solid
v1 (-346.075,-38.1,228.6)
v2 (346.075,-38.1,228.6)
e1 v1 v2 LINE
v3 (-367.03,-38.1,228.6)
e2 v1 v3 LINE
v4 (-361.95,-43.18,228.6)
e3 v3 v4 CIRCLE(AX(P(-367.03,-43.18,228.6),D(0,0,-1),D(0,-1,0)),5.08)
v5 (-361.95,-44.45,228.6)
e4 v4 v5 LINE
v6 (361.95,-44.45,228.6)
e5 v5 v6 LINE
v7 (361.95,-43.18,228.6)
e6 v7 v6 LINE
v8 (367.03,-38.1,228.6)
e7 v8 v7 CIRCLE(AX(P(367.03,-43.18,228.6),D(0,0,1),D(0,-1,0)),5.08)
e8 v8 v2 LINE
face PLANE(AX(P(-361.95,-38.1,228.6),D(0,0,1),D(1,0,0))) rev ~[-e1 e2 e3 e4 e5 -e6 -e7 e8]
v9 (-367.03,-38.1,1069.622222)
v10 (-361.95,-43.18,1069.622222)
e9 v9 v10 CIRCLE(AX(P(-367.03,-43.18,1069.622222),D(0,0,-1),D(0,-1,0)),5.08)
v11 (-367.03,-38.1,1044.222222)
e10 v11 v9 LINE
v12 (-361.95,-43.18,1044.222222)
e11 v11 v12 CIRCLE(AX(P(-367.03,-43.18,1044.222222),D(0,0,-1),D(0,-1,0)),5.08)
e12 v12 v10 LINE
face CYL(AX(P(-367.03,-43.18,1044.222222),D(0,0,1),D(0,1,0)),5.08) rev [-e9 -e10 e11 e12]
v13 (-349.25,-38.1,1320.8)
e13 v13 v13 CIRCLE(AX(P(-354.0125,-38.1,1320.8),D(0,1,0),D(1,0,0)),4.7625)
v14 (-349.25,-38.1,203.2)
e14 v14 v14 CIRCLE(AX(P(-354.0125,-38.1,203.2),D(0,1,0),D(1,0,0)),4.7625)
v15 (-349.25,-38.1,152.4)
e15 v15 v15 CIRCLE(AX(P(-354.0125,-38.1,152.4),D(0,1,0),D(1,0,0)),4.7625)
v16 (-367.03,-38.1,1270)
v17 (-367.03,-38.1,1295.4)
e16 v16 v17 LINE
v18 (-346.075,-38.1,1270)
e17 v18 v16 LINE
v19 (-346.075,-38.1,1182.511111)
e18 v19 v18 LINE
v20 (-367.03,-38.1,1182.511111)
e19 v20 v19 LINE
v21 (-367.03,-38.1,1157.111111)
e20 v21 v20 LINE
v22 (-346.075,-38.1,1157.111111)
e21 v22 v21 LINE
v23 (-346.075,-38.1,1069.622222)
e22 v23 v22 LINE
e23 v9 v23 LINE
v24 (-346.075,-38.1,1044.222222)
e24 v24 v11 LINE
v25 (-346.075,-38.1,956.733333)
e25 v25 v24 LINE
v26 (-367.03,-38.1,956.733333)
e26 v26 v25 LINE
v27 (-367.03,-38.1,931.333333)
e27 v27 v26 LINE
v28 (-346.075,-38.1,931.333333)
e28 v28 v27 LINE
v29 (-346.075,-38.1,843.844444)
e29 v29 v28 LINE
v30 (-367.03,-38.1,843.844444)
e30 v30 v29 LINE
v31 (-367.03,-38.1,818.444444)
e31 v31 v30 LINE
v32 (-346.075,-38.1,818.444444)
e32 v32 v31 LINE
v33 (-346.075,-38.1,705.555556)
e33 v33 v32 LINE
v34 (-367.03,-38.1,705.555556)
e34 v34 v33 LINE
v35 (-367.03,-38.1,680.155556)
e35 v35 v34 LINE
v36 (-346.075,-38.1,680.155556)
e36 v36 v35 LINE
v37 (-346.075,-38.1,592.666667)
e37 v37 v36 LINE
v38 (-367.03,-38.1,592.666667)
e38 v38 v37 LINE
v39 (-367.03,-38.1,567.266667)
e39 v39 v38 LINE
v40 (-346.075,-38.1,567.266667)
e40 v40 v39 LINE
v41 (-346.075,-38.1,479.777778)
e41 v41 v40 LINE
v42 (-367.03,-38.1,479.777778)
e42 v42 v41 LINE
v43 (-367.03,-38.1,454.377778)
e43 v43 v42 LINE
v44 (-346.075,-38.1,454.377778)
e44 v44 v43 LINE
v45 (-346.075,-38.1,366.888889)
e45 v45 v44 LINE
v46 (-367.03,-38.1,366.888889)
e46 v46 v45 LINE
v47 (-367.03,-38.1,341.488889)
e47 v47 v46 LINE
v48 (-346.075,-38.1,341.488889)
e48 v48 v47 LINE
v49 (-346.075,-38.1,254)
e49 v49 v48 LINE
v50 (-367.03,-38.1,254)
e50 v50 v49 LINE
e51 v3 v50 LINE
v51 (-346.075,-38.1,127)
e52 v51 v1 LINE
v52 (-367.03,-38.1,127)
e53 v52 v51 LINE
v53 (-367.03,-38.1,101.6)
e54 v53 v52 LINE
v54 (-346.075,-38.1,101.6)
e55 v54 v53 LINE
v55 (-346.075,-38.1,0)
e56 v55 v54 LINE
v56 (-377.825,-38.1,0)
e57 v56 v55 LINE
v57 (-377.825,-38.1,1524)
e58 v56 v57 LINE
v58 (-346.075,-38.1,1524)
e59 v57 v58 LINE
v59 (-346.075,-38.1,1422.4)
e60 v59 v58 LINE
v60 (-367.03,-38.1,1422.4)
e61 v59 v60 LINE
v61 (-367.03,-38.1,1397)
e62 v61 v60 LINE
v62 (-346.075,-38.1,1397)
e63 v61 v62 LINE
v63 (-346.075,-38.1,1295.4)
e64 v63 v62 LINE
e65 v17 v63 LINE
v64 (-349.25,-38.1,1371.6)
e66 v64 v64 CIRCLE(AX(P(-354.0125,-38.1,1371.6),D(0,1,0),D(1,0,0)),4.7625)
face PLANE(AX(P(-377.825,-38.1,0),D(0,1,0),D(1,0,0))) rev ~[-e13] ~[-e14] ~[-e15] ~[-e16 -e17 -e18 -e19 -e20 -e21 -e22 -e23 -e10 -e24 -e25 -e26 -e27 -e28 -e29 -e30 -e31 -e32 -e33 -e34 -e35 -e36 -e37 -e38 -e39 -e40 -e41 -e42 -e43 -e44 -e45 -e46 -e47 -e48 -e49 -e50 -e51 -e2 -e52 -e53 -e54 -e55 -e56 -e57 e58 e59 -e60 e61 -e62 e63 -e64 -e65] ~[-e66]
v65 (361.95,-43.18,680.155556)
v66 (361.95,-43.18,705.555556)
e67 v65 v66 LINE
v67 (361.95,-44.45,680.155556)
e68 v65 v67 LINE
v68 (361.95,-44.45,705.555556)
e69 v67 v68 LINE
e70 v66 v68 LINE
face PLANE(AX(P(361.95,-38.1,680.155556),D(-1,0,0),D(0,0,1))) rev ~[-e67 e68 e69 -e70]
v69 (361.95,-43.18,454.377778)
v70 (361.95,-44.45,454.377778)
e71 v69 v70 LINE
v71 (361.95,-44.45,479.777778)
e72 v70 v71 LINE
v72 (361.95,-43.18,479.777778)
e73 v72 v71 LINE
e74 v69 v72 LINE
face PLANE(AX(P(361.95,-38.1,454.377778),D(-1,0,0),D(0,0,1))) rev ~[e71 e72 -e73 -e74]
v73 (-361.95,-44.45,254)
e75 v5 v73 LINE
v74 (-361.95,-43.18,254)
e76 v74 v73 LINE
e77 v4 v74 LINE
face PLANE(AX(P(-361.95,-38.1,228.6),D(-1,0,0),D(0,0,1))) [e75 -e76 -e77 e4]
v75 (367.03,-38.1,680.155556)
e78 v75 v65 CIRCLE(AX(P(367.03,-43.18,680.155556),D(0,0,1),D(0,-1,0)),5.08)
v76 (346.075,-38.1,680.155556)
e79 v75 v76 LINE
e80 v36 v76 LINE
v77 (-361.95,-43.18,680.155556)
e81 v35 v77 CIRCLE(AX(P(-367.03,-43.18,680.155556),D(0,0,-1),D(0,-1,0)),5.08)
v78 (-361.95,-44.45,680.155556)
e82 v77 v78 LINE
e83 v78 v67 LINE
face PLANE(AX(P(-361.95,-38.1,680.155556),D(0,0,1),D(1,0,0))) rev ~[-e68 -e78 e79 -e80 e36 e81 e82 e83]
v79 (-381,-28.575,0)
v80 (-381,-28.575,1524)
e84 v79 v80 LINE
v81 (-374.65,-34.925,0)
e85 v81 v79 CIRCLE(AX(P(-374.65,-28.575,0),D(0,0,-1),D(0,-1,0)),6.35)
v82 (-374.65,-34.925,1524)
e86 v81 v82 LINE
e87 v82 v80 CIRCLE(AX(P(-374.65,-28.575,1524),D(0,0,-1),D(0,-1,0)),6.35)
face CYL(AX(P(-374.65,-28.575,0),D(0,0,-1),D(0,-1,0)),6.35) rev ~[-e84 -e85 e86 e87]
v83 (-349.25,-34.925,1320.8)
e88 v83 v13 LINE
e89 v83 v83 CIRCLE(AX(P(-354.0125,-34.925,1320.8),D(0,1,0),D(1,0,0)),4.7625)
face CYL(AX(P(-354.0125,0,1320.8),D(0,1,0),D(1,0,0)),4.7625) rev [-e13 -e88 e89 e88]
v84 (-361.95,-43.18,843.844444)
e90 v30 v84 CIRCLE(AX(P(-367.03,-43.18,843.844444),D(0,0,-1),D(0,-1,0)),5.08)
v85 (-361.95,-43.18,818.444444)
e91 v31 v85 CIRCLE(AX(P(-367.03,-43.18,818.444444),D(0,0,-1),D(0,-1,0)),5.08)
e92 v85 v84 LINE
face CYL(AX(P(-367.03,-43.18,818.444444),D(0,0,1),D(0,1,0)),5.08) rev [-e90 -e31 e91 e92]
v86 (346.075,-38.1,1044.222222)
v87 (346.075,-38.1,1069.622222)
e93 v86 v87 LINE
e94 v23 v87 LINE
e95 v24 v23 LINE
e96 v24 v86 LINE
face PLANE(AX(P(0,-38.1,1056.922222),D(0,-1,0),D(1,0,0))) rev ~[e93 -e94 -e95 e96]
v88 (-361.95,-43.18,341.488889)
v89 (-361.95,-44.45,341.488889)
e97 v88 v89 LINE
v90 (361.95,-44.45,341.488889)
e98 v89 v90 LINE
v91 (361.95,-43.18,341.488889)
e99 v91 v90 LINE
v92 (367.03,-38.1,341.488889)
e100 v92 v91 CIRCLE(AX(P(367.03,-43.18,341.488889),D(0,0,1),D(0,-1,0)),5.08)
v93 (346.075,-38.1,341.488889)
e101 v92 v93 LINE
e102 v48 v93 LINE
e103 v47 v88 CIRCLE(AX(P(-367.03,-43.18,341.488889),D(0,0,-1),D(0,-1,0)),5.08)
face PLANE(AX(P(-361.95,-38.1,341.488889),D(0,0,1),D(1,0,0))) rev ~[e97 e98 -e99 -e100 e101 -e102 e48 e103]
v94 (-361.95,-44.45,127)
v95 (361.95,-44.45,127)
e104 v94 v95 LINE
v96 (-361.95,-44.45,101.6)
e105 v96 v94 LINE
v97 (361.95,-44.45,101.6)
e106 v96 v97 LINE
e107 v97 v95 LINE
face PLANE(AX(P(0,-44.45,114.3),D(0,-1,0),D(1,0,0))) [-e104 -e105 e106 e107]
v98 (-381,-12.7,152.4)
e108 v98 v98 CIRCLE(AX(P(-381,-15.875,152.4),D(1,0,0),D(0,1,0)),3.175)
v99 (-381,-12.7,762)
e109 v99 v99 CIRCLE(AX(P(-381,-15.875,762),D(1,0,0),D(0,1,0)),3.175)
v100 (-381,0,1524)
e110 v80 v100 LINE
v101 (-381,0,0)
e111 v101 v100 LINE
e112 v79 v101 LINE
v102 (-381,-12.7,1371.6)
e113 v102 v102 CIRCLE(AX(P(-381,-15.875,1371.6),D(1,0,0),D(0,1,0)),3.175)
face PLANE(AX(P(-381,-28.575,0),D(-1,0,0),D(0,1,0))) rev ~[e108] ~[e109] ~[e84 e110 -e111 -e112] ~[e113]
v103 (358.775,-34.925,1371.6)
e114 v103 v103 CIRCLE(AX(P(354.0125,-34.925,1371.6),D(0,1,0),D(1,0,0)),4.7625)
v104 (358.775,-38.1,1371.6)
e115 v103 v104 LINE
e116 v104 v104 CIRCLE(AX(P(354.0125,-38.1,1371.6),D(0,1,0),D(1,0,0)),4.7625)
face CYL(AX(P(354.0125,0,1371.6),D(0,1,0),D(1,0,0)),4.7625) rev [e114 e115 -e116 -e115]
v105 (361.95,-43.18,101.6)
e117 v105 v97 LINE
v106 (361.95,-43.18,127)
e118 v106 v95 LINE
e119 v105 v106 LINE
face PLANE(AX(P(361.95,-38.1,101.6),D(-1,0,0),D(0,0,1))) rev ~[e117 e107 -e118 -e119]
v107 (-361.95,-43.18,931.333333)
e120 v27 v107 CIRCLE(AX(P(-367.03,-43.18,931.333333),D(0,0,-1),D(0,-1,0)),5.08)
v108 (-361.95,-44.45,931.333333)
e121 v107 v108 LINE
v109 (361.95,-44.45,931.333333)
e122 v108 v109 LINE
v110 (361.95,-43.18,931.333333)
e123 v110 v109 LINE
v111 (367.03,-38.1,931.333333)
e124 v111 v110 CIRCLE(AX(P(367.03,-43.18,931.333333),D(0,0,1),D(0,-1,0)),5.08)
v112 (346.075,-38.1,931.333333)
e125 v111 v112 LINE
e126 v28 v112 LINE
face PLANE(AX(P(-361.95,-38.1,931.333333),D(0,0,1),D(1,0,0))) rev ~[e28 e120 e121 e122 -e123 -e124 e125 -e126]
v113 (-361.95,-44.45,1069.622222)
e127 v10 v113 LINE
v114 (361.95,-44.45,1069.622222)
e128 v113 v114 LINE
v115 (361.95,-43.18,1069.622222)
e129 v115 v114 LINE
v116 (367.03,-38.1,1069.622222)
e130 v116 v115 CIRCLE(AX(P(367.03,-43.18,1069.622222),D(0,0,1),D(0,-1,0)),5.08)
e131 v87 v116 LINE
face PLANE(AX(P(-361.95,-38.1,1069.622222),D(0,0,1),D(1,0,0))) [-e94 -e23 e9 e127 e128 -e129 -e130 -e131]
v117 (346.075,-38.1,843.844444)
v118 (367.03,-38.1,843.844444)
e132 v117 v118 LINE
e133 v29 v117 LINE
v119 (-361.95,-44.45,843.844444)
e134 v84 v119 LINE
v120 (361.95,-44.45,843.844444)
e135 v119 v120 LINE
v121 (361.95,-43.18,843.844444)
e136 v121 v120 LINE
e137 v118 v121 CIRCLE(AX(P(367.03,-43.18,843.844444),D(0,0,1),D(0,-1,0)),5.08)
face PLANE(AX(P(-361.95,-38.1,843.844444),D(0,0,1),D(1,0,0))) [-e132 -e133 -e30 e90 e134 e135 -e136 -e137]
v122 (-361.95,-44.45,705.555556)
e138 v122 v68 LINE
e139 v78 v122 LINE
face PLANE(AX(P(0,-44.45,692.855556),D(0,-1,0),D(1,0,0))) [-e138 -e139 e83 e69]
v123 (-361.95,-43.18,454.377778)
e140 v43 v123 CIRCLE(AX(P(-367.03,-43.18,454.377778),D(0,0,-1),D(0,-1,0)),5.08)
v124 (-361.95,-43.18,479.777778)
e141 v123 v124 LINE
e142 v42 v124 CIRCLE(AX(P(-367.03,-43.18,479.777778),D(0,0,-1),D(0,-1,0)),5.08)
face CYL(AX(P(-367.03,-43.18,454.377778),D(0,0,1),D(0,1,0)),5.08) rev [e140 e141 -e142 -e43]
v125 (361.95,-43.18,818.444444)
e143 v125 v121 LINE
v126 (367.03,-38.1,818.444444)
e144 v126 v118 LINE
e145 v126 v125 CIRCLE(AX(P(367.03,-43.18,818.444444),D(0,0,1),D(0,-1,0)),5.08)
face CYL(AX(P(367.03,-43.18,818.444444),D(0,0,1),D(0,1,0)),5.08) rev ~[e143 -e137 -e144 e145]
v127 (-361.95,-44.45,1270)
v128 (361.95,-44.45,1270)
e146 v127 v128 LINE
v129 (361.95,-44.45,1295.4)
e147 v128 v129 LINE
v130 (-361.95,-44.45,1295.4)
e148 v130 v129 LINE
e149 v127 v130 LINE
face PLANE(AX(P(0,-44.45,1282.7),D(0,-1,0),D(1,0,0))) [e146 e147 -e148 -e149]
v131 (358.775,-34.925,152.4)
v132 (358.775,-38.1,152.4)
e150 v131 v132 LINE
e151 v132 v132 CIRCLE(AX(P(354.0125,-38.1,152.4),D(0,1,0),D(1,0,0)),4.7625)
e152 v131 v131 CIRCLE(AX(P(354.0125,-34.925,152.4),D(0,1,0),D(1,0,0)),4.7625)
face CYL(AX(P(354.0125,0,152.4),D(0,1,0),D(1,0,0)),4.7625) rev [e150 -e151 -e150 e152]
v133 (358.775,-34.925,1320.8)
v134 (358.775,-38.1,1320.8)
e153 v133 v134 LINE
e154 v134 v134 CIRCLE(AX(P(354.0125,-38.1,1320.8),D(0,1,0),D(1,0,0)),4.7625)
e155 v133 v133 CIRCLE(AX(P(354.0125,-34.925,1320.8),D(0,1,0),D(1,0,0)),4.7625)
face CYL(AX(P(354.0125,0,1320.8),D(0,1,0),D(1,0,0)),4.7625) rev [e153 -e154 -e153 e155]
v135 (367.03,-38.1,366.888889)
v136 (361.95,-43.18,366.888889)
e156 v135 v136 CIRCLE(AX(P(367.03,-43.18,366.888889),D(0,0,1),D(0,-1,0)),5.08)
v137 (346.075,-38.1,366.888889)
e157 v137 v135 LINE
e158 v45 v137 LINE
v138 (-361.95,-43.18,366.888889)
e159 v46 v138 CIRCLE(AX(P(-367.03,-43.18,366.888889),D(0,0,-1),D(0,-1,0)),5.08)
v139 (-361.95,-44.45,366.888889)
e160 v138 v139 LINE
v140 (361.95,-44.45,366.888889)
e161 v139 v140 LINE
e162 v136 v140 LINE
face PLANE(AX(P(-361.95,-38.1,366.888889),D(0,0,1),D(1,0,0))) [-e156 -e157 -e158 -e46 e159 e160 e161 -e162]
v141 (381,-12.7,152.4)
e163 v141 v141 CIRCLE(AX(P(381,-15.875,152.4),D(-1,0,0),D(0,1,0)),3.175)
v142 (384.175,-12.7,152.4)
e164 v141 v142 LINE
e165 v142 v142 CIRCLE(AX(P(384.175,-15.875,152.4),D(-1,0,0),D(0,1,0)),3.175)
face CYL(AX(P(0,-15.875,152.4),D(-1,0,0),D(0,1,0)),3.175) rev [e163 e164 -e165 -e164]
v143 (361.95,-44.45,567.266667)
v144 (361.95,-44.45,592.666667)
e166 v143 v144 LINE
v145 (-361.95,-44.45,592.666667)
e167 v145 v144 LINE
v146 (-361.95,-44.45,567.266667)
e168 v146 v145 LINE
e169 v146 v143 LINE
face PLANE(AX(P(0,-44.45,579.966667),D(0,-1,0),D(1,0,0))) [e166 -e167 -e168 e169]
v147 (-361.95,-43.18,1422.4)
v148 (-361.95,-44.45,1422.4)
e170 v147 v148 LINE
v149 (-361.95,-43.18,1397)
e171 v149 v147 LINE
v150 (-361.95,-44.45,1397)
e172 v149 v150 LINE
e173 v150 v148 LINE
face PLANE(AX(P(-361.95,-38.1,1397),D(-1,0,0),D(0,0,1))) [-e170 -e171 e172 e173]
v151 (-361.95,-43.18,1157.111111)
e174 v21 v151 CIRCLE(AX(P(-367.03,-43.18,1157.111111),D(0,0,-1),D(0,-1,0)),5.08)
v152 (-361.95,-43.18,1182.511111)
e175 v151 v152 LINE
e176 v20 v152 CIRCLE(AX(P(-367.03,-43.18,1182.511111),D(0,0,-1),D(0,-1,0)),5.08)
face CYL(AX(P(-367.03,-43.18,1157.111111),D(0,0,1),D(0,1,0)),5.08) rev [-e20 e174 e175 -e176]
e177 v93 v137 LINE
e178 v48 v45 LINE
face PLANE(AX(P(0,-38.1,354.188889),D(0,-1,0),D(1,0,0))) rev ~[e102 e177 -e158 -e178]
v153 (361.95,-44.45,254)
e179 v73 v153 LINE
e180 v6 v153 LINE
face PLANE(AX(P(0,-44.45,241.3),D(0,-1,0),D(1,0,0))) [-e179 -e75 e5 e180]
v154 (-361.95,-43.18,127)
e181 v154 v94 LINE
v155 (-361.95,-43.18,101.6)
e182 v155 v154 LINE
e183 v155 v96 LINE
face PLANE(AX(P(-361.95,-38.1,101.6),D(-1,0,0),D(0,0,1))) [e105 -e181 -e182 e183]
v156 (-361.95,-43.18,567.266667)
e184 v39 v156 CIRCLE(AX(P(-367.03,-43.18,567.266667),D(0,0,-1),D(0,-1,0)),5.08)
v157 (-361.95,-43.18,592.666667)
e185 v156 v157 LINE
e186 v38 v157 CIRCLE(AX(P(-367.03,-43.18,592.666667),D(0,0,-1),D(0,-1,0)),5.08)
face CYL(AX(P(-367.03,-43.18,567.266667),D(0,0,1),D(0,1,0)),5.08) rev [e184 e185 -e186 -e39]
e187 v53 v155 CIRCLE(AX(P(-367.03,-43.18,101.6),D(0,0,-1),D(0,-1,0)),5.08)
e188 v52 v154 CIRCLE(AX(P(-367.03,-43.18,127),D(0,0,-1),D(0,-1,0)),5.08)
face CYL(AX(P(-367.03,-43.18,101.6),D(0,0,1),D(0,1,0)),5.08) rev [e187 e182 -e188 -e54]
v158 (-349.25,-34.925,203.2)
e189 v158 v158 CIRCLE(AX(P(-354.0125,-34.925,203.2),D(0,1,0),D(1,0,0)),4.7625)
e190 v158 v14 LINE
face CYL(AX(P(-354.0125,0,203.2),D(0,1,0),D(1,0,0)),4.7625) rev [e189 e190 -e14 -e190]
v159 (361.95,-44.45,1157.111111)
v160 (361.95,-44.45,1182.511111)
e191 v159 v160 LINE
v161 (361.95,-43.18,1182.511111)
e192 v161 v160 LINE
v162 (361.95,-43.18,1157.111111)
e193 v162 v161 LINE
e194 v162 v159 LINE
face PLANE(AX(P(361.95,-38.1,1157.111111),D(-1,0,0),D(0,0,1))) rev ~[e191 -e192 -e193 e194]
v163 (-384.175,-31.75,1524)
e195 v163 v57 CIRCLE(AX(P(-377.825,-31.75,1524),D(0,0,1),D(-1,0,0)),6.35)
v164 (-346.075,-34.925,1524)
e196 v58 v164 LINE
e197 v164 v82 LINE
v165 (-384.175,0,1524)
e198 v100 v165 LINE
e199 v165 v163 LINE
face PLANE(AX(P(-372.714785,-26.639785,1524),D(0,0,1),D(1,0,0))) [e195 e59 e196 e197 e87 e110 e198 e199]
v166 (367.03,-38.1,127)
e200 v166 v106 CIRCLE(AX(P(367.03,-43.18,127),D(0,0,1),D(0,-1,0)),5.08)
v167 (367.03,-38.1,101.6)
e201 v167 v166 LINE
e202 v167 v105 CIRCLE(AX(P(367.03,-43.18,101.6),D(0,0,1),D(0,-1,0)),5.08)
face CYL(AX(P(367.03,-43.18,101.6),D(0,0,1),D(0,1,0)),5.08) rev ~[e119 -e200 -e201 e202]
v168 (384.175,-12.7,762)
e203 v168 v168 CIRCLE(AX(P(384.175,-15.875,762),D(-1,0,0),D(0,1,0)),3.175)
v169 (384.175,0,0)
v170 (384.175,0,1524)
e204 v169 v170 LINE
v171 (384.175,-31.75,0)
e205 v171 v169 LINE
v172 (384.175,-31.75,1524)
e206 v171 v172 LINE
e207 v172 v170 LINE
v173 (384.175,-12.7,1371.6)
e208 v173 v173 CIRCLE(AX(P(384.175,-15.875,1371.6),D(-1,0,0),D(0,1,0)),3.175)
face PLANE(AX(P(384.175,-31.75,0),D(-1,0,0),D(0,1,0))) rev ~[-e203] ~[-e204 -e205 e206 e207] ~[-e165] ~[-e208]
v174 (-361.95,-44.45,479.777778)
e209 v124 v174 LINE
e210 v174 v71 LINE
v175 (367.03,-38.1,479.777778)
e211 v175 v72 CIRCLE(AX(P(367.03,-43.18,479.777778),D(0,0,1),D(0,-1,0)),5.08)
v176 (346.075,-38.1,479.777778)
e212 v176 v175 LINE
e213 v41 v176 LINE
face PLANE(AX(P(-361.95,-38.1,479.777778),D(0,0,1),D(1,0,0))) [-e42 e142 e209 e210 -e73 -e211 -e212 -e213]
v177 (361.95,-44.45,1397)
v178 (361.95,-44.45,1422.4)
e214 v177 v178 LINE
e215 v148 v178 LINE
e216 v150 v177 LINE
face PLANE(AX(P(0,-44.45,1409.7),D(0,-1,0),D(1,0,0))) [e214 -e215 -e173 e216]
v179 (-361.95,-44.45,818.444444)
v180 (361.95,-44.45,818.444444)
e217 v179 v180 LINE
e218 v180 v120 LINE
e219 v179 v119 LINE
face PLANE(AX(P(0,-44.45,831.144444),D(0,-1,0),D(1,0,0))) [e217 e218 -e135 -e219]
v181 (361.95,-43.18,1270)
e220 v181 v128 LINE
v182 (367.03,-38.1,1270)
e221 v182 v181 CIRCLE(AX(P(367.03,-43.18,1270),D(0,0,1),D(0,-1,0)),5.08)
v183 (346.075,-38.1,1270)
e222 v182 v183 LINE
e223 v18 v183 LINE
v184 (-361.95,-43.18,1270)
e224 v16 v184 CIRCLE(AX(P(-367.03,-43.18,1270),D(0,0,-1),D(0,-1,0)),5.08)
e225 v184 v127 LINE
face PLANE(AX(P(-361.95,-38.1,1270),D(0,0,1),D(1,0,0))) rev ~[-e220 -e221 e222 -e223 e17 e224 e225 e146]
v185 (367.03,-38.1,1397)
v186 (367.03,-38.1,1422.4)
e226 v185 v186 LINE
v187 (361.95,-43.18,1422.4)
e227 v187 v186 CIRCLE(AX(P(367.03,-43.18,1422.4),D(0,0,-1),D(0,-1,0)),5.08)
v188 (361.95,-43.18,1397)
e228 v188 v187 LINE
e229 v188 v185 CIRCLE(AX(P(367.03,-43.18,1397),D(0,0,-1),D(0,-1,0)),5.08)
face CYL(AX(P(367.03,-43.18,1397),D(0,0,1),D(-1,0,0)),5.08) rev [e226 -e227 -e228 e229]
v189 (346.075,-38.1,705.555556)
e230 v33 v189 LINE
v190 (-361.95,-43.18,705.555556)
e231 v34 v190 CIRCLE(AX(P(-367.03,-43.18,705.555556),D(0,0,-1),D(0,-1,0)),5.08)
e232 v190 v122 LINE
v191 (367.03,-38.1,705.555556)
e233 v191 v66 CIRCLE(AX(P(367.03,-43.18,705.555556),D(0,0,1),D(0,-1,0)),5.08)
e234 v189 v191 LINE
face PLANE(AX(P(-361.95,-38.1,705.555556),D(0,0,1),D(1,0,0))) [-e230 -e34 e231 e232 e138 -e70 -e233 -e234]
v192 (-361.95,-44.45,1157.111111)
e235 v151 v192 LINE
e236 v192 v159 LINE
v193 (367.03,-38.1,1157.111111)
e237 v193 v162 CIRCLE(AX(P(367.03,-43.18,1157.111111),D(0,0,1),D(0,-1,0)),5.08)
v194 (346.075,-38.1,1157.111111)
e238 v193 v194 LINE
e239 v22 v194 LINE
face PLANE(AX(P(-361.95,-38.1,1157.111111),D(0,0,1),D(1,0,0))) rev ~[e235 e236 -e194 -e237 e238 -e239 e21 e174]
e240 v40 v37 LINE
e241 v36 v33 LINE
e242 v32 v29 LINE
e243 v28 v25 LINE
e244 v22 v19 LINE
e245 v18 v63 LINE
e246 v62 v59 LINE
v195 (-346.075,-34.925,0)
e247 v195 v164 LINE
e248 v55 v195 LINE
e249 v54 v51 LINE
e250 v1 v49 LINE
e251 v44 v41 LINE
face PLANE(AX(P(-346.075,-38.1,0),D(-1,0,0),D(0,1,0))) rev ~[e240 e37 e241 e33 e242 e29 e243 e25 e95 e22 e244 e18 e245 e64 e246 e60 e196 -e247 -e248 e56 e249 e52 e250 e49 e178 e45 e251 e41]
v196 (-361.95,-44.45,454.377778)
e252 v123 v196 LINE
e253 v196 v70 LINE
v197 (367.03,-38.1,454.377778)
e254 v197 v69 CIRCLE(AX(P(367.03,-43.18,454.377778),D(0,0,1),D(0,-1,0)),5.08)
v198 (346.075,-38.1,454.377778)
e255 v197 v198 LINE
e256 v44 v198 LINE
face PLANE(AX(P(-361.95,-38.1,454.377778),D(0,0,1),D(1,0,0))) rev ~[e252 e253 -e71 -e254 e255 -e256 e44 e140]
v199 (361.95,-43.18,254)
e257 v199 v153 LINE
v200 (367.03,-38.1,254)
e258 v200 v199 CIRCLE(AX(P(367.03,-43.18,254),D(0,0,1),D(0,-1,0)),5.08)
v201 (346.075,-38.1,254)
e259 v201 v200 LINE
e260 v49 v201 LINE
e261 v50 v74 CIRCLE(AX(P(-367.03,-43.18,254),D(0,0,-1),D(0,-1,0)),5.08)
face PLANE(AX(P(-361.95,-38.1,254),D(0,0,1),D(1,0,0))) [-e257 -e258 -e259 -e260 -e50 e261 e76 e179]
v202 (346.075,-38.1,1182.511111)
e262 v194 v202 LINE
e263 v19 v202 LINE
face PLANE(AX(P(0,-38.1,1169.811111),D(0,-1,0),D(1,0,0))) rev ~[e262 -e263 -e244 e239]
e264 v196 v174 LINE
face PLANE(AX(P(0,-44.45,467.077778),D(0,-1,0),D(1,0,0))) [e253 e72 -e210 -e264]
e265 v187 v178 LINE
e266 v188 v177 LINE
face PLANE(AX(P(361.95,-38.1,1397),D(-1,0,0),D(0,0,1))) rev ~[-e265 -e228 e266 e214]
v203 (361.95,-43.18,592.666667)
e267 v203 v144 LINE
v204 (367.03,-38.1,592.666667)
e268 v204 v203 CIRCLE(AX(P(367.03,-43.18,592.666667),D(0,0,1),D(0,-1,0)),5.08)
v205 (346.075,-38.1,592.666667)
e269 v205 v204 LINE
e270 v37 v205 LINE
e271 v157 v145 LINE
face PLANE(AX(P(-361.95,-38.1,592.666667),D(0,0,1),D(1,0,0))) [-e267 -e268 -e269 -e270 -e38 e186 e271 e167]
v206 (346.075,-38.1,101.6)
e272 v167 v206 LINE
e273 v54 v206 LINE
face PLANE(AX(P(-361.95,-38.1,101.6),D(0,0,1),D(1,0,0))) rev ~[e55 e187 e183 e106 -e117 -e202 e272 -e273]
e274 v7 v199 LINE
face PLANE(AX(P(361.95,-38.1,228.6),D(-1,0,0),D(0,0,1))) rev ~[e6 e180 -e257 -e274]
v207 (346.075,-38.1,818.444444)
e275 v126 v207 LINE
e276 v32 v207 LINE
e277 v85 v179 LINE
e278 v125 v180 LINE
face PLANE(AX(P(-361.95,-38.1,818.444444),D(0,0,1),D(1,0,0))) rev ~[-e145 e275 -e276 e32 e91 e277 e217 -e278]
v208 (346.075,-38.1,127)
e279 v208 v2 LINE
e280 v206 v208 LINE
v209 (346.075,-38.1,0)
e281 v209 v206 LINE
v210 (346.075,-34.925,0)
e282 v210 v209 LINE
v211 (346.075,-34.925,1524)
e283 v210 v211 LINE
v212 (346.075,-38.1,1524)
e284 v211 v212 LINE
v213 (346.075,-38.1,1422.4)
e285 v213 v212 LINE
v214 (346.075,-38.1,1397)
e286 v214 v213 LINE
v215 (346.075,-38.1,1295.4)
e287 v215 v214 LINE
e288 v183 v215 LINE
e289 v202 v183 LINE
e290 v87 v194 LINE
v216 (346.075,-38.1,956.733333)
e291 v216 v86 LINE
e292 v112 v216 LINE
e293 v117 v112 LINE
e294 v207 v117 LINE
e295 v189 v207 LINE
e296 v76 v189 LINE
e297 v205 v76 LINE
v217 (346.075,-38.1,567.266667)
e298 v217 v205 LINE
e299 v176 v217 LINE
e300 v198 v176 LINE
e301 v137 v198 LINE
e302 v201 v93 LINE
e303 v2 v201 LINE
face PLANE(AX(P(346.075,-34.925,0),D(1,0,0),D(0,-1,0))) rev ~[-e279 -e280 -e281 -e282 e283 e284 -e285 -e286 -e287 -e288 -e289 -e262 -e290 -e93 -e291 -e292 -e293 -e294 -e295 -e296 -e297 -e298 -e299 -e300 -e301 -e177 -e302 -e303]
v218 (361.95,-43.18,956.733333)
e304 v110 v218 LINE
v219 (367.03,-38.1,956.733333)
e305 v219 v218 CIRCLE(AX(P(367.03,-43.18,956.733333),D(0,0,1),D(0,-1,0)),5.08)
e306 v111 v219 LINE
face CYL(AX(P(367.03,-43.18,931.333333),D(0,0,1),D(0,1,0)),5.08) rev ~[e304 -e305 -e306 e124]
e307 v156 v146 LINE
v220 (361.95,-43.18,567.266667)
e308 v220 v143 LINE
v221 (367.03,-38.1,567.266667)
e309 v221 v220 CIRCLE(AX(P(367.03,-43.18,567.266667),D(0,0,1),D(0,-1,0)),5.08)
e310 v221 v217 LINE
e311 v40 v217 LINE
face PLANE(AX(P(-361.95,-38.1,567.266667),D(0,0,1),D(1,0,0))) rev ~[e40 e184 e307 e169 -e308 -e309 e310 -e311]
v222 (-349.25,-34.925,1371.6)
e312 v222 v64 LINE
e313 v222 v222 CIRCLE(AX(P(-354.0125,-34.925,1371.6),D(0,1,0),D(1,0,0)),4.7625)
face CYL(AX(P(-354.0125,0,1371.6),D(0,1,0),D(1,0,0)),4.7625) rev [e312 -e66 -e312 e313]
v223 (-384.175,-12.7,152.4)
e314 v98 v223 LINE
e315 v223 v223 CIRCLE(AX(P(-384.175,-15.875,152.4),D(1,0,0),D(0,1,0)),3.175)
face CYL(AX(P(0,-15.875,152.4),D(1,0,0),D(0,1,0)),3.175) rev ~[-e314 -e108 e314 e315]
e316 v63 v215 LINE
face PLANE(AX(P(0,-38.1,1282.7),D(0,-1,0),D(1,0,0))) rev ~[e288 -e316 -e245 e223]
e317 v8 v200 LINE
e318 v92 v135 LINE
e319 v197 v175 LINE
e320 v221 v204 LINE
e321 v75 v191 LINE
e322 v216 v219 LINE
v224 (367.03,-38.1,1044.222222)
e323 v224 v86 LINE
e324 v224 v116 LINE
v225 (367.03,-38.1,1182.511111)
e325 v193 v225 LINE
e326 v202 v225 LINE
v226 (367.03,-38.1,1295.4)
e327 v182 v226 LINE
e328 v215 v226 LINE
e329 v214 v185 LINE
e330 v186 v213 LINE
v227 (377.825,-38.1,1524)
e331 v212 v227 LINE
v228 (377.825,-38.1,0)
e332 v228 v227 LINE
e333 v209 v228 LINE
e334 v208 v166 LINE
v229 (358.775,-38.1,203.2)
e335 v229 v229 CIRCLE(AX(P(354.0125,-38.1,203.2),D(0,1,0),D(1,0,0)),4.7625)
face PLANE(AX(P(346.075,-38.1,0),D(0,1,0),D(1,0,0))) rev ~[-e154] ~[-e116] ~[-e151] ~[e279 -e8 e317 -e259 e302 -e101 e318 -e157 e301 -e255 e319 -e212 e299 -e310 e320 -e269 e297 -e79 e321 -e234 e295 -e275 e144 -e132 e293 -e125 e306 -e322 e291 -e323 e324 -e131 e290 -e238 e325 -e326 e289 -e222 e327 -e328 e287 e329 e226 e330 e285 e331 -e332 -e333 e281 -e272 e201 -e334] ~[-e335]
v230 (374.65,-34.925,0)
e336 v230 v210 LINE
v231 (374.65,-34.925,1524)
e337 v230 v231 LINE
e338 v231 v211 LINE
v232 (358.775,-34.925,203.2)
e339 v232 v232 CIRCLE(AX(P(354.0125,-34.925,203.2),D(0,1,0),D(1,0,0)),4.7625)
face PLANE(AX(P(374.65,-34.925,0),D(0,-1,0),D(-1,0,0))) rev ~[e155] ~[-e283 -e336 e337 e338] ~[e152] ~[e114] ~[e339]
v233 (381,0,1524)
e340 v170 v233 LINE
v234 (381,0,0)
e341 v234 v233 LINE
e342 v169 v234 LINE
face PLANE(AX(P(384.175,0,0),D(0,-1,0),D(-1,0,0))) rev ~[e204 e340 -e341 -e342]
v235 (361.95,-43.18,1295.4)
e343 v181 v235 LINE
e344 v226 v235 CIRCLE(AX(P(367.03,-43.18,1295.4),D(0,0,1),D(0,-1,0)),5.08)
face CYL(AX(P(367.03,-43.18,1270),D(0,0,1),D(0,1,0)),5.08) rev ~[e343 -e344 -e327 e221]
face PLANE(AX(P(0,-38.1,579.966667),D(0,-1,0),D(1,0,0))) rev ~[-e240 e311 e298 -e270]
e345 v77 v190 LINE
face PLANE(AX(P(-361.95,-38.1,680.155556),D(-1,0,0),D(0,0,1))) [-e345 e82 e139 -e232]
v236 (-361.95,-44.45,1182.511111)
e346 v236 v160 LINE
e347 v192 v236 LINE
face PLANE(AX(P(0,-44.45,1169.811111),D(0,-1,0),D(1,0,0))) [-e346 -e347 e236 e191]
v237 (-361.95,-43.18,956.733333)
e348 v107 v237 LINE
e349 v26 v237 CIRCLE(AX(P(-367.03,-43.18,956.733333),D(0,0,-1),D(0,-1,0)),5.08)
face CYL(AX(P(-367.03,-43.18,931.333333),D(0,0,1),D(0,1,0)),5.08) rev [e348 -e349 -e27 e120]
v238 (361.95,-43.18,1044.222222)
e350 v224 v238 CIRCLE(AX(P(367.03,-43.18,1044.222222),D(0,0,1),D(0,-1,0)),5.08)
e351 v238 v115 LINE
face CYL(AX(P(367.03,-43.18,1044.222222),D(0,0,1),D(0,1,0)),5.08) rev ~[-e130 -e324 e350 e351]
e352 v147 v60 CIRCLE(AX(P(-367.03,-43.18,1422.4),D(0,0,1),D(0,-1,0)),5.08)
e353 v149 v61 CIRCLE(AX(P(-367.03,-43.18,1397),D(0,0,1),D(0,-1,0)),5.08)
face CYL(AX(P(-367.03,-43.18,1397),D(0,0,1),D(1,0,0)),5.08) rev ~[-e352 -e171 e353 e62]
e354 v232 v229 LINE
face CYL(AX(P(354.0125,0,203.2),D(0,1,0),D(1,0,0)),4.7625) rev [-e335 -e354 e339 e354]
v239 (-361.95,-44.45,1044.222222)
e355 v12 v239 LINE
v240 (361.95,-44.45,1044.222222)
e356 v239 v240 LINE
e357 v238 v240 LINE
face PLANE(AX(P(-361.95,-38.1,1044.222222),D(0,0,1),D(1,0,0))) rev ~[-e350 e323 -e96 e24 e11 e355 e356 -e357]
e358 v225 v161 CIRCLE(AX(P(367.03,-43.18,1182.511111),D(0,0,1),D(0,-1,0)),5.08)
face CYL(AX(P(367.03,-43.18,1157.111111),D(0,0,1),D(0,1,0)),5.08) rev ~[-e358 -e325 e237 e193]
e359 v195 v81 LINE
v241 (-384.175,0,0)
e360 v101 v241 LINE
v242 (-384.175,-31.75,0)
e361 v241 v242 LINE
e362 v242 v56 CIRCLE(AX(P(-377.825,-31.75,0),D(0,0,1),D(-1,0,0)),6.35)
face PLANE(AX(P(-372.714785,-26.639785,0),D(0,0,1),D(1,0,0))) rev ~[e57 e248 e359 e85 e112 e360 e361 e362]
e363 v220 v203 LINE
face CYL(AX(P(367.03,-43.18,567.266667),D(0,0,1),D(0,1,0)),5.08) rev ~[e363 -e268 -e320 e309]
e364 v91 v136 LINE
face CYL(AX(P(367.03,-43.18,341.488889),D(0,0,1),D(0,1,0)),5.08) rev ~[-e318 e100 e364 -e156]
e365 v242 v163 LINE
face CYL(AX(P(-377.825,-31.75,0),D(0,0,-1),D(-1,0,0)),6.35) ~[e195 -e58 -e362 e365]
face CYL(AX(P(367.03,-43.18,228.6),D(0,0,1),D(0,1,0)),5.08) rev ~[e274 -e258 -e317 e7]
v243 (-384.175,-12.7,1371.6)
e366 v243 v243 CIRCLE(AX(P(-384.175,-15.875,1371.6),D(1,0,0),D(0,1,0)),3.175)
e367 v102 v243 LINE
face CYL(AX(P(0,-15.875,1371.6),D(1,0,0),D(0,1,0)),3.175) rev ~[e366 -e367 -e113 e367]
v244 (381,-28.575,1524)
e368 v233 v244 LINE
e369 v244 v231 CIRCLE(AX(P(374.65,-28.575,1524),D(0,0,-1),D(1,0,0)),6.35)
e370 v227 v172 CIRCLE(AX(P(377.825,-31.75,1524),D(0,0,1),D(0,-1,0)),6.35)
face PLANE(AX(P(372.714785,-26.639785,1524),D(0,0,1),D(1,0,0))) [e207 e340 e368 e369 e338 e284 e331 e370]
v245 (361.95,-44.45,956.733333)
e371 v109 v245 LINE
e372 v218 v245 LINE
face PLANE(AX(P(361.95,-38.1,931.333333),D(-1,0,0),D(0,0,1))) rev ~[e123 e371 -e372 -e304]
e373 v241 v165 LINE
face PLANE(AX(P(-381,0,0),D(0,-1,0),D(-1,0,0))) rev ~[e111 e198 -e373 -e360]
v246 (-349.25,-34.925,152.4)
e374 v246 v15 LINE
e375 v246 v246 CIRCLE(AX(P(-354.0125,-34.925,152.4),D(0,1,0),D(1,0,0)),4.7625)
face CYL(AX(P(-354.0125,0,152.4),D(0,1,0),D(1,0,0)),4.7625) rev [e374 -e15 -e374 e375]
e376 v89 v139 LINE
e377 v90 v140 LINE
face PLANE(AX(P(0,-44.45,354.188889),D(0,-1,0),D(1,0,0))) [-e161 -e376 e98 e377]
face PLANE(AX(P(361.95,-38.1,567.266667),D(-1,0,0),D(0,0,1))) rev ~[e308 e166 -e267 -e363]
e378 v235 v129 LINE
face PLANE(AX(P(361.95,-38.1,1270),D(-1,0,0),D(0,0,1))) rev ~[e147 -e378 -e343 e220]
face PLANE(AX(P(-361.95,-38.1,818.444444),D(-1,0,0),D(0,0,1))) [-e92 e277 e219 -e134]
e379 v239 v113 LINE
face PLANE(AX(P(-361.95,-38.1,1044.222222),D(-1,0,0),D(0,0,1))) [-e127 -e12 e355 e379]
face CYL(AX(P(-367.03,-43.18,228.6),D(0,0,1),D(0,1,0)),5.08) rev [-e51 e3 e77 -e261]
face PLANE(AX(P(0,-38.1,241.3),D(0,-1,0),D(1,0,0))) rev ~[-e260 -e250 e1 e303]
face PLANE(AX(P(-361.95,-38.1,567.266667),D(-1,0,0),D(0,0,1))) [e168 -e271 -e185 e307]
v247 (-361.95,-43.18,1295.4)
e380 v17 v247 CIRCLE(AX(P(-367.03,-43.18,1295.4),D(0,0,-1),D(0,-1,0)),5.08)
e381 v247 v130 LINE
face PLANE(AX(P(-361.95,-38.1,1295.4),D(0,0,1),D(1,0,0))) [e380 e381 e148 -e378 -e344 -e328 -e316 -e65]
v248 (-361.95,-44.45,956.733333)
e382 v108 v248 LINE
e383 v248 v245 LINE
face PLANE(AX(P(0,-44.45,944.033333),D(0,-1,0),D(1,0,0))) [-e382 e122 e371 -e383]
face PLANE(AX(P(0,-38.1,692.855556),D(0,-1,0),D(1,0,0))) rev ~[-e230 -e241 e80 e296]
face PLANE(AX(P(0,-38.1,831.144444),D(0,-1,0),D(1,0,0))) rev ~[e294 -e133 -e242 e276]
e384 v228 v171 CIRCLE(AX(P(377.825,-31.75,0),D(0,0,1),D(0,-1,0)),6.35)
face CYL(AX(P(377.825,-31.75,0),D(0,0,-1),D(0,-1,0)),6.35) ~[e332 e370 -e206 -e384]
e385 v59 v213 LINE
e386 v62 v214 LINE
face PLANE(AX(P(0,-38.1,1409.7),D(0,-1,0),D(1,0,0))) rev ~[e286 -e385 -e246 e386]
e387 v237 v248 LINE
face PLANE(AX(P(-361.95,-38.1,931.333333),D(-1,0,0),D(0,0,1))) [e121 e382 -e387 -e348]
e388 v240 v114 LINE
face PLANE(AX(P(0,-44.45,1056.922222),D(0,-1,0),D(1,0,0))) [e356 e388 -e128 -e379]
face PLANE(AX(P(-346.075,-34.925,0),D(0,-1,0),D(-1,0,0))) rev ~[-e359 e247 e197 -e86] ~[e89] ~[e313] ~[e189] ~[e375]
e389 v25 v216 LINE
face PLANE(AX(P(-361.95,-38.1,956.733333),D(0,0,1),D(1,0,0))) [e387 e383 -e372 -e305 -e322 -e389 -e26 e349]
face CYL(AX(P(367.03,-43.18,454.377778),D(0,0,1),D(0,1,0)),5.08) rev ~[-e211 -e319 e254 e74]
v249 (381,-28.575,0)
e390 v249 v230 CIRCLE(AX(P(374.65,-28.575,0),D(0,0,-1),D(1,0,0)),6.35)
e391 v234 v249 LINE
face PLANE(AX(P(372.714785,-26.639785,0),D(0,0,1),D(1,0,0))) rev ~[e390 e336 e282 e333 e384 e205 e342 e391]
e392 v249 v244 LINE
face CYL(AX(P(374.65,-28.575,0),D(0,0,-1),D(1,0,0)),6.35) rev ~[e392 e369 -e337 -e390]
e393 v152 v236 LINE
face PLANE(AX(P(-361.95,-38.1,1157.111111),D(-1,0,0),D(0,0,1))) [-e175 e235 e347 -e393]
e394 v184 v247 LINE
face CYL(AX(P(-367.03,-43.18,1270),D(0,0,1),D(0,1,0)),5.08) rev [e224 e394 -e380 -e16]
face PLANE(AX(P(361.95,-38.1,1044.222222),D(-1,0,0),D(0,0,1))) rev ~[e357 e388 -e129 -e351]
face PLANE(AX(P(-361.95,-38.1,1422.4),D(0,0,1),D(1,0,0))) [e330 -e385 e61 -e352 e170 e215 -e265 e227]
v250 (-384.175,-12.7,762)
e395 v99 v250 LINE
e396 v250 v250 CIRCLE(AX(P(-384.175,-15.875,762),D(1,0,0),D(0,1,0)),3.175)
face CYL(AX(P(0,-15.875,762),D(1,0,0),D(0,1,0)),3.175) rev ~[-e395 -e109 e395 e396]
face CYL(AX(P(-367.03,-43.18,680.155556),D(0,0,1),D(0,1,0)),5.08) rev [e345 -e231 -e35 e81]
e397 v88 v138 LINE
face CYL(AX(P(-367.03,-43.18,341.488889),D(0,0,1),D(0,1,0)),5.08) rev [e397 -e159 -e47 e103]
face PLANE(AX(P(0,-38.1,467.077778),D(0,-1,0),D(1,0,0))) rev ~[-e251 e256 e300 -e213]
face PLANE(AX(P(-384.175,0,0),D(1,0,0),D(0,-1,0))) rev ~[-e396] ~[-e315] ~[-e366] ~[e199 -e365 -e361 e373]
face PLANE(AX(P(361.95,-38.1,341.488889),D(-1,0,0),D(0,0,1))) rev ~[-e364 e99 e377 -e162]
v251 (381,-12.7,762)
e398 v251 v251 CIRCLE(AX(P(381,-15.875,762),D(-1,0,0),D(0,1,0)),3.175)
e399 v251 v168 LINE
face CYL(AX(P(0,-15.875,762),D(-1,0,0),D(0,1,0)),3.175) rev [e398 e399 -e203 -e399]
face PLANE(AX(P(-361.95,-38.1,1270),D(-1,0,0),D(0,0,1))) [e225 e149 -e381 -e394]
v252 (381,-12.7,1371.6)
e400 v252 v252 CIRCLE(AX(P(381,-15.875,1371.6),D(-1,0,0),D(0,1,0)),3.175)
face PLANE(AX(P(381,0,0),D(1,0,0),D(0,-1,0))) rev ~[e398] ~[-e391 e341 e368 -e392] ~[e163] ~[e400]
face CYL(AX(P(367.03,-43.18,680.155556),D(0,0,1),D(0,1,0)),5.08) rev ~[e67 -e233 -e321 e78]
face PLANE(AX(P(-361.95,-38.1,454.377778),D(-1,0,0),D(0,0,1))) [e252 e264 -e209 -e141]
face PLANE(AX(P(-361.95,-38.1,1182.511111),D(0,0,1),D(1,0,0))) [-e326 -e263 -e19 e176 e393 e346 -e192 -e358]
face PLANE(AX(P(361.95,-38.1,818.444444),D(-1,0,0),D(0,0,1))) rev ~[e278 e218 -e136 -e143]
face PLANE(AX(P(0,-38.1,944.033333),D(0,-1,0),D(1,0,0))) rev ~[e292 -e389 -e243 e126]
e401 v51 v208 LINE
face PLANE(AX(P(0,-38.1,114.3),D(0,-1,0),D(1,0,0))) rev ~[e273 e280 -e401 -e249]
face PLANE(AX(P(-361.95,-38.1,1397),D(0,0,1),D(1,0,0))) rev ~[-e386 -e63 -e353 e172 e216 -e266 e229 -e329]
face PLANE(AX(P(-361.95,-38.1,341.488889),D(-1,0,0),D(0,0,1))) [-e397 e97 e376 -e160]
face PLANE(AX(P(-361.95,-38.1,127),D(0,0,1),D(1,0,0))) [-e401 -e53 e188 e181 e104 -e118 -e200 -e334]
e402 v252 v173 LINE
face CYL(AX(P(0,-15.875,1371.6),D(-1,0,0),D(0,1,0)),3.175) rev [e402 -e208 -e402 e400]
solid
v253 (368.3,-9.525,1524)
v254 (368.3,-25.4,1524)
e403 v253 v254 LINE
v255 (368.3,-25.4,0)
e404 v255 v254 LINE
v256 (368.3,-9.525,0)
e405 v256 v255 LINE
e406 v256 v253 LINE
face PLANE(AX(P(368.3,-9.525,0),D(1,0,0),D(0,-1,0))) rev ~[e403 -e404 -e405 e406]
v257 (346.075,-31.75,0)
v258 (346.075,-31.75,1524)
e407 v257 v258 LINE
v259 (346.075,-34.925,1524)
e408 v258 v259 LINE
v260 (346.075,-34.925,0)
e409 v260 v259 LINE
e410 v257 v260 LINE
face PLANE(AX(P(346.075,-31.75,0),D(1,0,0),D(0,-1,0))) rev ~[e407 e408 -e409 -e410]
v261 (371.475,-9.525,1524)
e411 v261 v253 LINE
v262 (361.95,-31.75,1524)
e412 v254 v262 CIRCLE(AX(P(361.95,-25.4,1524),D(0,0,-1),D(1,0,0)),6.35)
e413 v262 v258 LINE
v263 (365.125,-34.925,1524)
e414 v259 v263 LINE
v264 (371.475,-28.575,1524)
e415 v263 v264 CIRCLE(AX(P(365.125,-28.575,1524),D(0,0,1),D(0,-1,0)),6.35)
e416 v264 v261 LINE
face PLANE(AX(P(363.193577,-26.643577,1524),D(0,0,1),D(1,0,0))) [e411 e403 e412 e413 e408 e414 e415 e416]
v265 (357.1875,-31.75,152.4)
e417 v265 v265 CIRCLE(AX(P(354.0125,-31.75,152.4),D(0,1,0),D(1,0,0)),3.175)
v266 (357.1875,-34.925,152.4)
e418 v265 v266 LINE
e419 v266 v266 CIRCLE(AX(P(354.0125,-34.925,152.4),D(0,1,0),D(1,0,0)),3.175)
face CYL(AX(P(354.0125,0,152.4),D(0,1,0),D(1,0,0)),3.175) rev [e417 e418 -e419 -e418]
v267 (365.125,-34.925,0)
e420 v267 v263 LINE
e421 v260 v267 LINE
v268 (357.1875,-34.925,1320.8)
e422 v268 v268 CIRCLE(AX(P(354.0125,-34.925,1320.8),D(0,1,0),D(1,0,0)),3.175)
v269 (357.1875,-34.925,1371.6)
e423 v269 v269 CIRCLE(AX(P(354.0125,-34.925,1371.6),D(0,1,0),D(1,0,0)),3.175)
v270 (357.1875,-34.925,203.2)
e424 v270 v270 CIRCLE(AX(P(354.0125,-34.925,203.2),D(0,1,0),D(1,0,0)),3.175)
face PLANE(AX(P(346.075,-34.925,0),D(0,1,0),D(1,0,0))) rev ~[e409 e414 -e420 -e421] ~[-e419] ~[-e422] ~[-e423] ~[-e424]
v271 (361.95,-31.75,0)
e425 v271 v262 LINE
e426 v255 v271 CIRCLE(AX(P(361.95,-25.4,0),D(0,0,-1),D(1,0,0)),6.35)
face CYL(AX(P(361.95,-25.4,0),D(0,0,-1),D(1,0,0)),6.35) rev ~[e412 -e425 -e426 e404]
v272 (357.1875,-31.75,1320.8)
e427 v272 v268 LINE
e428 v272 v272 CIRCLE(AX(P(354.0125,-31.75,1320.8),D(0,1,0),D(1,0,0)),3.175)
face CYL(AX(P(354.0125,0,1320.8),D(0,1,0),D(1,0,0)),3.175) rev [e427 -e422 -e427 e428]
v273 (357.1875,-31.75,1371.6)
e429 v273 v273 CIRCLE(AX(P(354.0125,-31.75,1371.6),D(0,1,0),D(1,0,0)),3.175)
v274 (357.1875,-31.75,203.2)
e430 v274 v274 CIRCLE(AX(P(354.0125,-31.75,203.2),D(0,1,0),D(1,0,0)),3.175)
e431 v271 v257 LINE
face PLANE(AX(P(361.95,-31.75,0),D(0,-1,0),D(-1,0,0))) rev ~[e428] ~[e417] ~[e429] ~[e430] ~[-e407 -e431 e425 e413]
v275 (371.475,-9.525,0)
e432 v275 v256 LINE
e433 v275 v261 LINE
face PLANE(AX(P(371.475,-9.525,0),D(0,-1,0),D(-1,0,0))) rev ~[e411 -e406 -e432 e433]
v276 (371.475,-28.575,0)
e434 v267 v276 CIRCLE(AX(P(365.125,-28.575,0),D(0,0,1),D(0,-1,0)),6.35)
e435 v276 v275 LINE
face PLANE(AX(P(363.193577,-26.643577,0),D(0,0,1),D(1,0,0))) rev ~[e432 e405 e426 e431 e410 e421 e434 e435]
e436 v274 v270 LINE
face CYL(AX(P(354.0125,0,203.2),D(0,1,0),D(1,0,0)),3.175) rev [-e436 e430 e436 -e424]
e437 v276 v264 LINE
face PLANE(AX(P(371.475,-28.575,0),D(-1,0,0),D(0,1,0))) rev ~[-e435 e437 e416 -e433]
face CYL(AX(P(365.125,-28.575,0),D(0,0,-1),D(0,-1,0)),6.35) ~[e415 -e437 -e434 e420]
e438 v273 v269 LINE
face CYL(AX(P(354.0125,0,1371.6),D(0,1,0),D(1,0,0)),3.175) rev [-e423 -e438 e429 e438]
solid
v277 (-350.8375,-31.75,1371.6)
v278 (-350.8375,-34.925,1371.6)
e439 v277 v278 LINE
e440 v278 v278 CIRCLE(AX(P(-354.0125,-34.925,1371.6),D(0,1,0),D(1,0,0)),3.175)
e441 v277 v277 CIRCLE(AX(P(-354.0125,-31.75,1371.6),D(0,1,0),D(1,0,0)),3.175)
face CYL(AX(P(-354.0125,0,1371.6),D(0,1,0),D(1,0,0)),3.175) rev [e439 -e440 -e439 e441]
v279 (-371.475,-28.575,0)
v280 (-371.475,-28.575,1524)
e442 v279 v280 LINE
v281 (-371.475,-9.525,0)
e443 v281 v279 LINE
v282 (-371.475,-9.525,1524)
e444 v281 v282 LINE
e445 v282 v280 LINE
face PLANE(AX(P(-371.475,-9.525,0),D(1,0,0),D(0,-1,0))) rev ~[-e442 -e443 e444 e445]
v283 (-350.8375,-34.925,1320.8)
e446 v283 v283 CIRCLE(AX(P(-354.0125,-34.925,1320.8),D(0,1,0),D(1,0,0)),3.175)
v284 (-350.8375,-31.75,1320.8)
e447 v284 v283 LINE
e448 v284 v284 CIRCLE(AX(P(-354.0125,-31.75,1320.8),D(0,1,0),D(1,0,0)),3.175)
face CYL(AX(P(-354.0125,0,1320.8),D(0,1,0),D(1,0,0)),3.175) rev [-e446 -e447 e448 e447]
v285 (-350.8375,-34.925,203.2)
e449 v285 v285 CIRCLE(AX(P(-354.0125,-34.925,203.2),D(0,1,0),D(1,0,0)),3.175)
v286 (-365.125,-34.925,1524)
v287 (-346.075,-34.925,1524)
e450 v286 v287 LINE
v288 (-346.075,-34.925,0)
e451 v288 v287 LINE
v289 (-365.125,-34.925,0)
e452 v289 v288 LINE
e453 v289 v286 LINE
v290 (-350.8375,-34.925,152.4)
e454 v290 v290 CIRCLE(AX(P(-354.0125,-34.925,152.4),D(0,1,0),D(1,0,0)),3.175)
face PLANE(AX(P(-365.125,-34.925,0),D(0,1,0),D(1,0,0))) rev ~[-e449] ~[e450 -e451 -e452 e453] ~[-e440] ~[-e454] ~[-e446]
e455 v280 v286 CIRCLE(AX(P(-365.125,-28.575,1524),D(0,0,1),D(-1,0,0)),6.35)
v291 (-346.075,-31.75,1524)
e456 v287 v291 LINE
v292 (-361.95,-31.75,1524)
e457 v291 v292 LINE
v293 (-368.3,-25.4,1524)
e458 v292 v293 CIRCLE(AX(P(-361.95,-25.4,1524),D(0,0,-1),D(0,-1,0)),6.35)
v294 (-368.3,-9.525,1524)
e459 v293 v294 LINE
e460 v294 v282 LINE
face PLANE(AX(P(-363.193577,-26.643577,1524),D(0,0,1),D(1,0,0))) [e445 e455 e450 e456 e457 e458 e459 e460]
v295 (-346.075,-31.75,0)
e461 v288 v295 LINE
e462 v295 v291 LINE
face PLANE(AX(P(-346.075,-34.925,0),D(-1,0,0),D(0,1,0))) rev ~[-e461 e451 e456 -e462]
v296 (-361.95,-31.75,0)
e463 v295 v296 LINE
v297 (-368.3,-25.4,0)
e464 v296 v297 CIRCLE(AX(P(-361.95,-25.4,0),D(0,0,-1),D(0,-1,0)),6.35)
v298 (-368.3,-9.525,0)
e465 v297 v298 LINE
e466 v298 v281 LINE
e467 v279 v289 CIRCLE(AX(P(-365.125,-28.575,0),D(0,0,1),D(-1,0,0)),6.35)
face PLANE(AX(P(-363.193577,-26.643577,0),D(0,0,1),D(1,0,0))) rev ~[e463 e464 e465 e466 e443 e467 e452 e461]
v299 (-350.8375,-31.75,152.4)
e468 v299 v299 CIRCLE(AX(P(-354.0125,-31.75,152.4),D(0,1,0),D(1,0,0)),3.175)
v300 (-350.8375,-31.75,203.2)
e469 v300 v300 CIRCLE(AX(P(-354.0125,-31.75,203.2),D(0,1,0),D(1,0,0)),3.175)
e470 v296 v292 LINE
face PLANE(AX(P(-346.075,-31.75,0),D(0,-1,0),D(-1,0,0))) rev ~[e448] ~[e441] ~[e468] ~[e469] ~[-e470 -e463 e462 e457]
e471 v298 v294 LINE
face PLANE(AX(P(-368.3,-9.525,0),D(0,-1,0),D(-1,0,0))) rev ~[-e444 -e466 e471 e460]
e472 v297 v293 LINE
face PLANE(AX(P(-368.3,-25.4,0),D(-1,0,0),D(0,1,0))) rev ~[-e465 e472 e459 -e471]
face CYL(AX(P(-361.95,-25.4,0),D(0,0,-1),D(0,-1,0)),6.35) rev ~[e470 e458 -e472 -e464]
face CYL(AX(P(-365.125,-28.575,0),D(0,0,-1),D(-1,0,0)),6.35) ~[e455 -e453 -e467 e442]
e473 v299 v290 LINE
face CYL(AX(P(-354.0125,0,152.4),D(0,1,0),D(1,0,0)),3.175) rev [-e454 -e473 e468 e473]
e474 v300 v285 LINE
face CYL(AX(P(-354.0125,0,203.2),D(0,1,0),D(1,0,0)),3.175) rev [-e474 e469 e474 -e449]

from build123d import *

# Parameters (mm, degrees)
F1_DEPTH      = 1524
F2_DEPTH      = 1524
F3_R          = 3.175
F4_DEPTH      = 384.176
F4_DEPTH_BACK = 384.176
F5_R          = 3.175
F7_DEPTH      = 38.101
F6_R          = 4.7625
F8_DEPTH      = 38.101
F9_W          = 723.9
F9_H          = 25.4
F10_DEPTH     = 6.35
F11_R         = 5.08


with BuildPart() as f1:
    # F0 (on Top) → F1 (new body)
    with BuildSketch(Plane.XY):
        with BuildLine():
            Line((-381, 0), (-384.175, 0))
            Line((-384.175, 0), (-384.175, -31.75))
            ThreePointArc((-384.175, -31.75), (-382.3151280605, -36.2401280605), (-377.825, -38.1))
            Line((-377.825, -38.1), (-346.075, -38.1))
            Line((-346.075, -38.1), (-346.075, -34.925))
            Line((-346.075, -34.925), (-365.125, -34.925))
            Line((-365.125, -34.925), (-374.65, -34.925))
            ThreePointArc((-374.65, -34.925), (-379.1401280605, -33.0651280605), (-381, -28.575))
            Line((-381, -28.575), (-381, 0))
        make_face()
    extrude(amount=F1_DEPTH)


with BuildPart() as f1b:
    # F0 (on Top) → F1, piece 2 (new body)
    with BuildSketch(Plane.XY):
        with BuildLine():
            Line((374.65, -34.925), (365.125, -34.925))
            Line((365.125, -34.925), (346.075, -34.925))
            Line((346.075, -34.925), (346.075, -38.1))
            Line((346.075, -38.1), (377.825, -38.1))
            ThreePointArc((377.825, -38.1), (382.3151280605, -36.2401280605), (384.175, -31.75))
            Line((384.175, -31.75), (384.175, 0))
            Line((384.175, 0), (381, 0))
            Line((381, 0), (381, -28.575))
            ThreePointArc((381, -28.575), (379.1401280605, -33.0651280605), (374.65, -34.925))
        make_face()
    extrude(amount=F1_DEPTH)


with BuildPart() as f2:
    # F0 (on Top) → F2 (new body)
    with BuildSketch(Plane.XY):
        with BuildLine():
            ThreePointArc((365.125, -34.925), (369.6151280605, -33.0651280605), (371.475, -28.575))
            Line((371.475, -28.575), (371.475, -9.525))
            Line((371.475, -9.525), (368.3, -9.525))
            Line((368.3, -9.525), (368.3, -25.4))
            ThreePointArc((368.3, -25.4), (366.4401280605, -29.8901280605), (361.95, -31.75))
            Line((361.95, -31.75), (346.075, -31.75))
            Line((346.075, -31.75), (346.075, -34.925))
            Line((346.075, -34.925), (365.125, -34.925))
        make_face()
    extrude(amount=F2_DEPTH)


with BuildPart() as f2b:
    # F0 (on Top) → F2, piece 2 (new body)
    with BuildSketch(Plane.XY):
        with BuildLine():
            Line((-365.125, -34.925), (-346.075, -34.925))
            Line((-346.075, -34.925), (-346.075, -31.75))
            Line((-346.075, -31.75), (-361.95, -31.75))
            ThreePointArc((-361.95, -31.75), (-366.4401280605, -29.8901280605), (-368.3, -25.4))
            Line((-368.3, -25.4), (-368.3, -9.525))
            Line((-368.3, -9.525), (-371.475, -9.525))
            Line((-371.475, -9.525), (-371.475, -28.575))
            ThreePointArc((-371.475, -28.575), (-369.6151280605, -33.0651280605), (-365.125, -34.925))
        make_face()
    extrude(amount=F2_DEPTH)


with BuildPart() as f4_tool:
    # F3 (on Right) → F4 (new body, two sides)
    with BuildSketch(Plane.YZ) as f4_sk:
        with Locations((-15.875, 152.4)):
            Circle(F3_R)
        with Locations((-15.875, 762)):
            Circle(F3_R)
        with Locations((-15.875, 1371.6)):
            Circle(F3_R)
    extrude(amount=-F4_DEPTH)
    extrude(f4_sk.sketch, amount=F4_DEPTH_BACK)


with BuildPart() as f1_1:
    add(f1.part)

    # F4: cut by f4_tool
    add(f4_tool.part, mode=Mode.SUBTRACT)


with BuildPart() as f1b_1:
    add(f1b.part)

    # F4: cut by f4_tool
    add(f4_tool.part, mode=Mode.SUBTRACT)


with BuildPart() as f7_tool:
    # F5 (on Front) → F7 (new body, through all)
    with BuildSketch(Plane.XZ):
        with Locations((-354.0125, 152.4)):
            Circle(F5_R)
        with Locations((-354.0125, 203.2)):
            Circle(F5_R)
        with Locations((-354.0125, 1320.8)):
            Circle(F5_R)
        with Locations((-354.0125, 1371.6)):
            Circle(F5_R)
        with Locations((354.0125, 152.4)):
            Circle(F5_R)
        with Locations((354.0125, 203.2)):
            Circle(F5_R)
        with Locations((354.0125, 1371.6)):
            Circle(F5_R)
        with Locations((354.0125, 1320.8)):
            Circle(F5_R)
    extrude(amount=F7_DEPTH)


with BuildPart() as f1_2:
    add(f1_1.part)

    # F7: cut by f7_tool
    add(f7_tool.part, mode=Mode.SUBTRACT)


with BuildPart() as f1b_2:
    add(f1b_1.part)

    # F7: cut by f7_tool
    add(f7_tool.part, mode=Mode.SUBTRACT)


with BuildPart() as f2_1:
    add(f2.part)

    # F7: cut by f7_tool
    add(f7_tool.part, mode=Mode.SUBTRACT)


with BuildPart() as f2b_1:
    add(f2b.part)

    # F7: cut by f7_tool
    add(f7_tool.part, mode=Mode.SUBTRACT)


with BuildPart() as f8_tool:
    # F6 (on Front) → F8 (new body, through all)
    with BuildSketch(Plane.XZ):
        with Locations((-354.0125, 1371.6)):
            Circle(F6_R)
        with Locations((-354.0125, 1320.8)):
            Circle(F6_R)
        with Locations((-354.0125, 203.2)):
            Circle(F6_R)
        with Locations((-354.0125, 152.4)):
            Circle(F6_R)
        with Locations((354.0125, 152.4)):
            Circle(F6_R)
        with Locations((354.0125, 203.2)):
            Circle(F6_R)
        with Locations((354.0125, 1371.6)):
            Circle(F6_R)
        with Locations((354.0125, 1320.8)):
            Circle(F6_R)
    extrude(amount=F8_DEPTH)


with BuildPart() as f1_3:
    add(f1_2.part)

    # F8: cut by f8_tool
    add(f8_tool.part, mode=Mode.SUBTRACT)



with BuildPart() as f1b_3:
    add(f1b_2.part)

    # F8: cut by f8_tool
    add(f8_tool.part, mode=Mode.SUBTRACT)


with BuildPart() as f1_4:
    add(f1_3.part)

    add(f1b_3.part)  # F10 merges F1b
    # F9 (on face) → F10 (join)
    with BuildSketch(Plane.XZ.offset(38.1)):
        with Locations((0, 1409.7)):
            Rectangle(F9_W, F9_H)
        with Locations((0, 1282.7)):
            Rectangle(F9_W, F9_H)
        with Locations((0, 1169.8111111111)):
            Rectangle(F9_W, F9_H)
        with Locations((0, 1056.9222222222)):
            Rectangle(F9_W, F9_H)
        with Locations((0, 944.0333333333)):
            Rectangle(F9_W, F9_H)
        with Locations((0, 831.1444444444)):
            Rectangle(F9_W, F9_H)
        with Locations((0, 467.0777777778)):
            Rectangle(F9_W, F9_H)
        with Locations((0, 579.9666666667)):
            Rectangle(F9_W, F9_H)
        with Locations((0, 114.3)):
            Rectangle(F9_W, F9_H)
        with Locations((0, 692.8555555556)):
            Rectangle(F9_W, F9_H)
        with Locations((0, 241.3)):
            Rectangle(F9_W, F9_H)
        with Locations((0, 354.1888888889)):
            Rectangle(F9_W, F9_H)
    extrude(amount=F10_DEPTH)

    # F11
    f11_edges = [f1_4.edges().sort_by_distance(p)[0] for p in [
        (361.95, -38.1, 1409.7),
        (361.95, -38.1, 1282.7),
        (361.95, -38.1, 1169.811111),
        (361.95, -38.1, 1056.922222),
        (361.95, -38.1, 944.033333),
        (361.95, -38.1, 831.144444),
        (361.95, -38.1, 692.855556),
        (361.95, -38.1, 579.966667),
        (361.95, -38.1, 467.077778),
        (361.95, -38.1, 354.188889),
        (361.95, -38.1, 241.3),
        (361.95, -38.1, 114.3),
        (-361.95, -38.1, 114.3),
        (-361.95, -38.1, 241.3),
        (-361.95, -38.1, 354.188889),
        (-361.95, -38.1, 467.077778),
        (-361.95, -38.1, 579.966667),
        (-361.95, -38.1, 692.855556),
        (-361.95, -38.1, 831.144444),
        (-361.95, -38.1, 944.033333),
        (-361.95, -38.1, 1056.922222),
        (-361.95, -38.1, 1169.811111),
        (-361.95, -38.1, 1282.7),
        (-361.95, -38.1, 1409.7),
    ]]
    fillet(f11_edges, radius=F11_R)


solid = Compound([f2_1.part, f2b_1.part, f1_4.part])
